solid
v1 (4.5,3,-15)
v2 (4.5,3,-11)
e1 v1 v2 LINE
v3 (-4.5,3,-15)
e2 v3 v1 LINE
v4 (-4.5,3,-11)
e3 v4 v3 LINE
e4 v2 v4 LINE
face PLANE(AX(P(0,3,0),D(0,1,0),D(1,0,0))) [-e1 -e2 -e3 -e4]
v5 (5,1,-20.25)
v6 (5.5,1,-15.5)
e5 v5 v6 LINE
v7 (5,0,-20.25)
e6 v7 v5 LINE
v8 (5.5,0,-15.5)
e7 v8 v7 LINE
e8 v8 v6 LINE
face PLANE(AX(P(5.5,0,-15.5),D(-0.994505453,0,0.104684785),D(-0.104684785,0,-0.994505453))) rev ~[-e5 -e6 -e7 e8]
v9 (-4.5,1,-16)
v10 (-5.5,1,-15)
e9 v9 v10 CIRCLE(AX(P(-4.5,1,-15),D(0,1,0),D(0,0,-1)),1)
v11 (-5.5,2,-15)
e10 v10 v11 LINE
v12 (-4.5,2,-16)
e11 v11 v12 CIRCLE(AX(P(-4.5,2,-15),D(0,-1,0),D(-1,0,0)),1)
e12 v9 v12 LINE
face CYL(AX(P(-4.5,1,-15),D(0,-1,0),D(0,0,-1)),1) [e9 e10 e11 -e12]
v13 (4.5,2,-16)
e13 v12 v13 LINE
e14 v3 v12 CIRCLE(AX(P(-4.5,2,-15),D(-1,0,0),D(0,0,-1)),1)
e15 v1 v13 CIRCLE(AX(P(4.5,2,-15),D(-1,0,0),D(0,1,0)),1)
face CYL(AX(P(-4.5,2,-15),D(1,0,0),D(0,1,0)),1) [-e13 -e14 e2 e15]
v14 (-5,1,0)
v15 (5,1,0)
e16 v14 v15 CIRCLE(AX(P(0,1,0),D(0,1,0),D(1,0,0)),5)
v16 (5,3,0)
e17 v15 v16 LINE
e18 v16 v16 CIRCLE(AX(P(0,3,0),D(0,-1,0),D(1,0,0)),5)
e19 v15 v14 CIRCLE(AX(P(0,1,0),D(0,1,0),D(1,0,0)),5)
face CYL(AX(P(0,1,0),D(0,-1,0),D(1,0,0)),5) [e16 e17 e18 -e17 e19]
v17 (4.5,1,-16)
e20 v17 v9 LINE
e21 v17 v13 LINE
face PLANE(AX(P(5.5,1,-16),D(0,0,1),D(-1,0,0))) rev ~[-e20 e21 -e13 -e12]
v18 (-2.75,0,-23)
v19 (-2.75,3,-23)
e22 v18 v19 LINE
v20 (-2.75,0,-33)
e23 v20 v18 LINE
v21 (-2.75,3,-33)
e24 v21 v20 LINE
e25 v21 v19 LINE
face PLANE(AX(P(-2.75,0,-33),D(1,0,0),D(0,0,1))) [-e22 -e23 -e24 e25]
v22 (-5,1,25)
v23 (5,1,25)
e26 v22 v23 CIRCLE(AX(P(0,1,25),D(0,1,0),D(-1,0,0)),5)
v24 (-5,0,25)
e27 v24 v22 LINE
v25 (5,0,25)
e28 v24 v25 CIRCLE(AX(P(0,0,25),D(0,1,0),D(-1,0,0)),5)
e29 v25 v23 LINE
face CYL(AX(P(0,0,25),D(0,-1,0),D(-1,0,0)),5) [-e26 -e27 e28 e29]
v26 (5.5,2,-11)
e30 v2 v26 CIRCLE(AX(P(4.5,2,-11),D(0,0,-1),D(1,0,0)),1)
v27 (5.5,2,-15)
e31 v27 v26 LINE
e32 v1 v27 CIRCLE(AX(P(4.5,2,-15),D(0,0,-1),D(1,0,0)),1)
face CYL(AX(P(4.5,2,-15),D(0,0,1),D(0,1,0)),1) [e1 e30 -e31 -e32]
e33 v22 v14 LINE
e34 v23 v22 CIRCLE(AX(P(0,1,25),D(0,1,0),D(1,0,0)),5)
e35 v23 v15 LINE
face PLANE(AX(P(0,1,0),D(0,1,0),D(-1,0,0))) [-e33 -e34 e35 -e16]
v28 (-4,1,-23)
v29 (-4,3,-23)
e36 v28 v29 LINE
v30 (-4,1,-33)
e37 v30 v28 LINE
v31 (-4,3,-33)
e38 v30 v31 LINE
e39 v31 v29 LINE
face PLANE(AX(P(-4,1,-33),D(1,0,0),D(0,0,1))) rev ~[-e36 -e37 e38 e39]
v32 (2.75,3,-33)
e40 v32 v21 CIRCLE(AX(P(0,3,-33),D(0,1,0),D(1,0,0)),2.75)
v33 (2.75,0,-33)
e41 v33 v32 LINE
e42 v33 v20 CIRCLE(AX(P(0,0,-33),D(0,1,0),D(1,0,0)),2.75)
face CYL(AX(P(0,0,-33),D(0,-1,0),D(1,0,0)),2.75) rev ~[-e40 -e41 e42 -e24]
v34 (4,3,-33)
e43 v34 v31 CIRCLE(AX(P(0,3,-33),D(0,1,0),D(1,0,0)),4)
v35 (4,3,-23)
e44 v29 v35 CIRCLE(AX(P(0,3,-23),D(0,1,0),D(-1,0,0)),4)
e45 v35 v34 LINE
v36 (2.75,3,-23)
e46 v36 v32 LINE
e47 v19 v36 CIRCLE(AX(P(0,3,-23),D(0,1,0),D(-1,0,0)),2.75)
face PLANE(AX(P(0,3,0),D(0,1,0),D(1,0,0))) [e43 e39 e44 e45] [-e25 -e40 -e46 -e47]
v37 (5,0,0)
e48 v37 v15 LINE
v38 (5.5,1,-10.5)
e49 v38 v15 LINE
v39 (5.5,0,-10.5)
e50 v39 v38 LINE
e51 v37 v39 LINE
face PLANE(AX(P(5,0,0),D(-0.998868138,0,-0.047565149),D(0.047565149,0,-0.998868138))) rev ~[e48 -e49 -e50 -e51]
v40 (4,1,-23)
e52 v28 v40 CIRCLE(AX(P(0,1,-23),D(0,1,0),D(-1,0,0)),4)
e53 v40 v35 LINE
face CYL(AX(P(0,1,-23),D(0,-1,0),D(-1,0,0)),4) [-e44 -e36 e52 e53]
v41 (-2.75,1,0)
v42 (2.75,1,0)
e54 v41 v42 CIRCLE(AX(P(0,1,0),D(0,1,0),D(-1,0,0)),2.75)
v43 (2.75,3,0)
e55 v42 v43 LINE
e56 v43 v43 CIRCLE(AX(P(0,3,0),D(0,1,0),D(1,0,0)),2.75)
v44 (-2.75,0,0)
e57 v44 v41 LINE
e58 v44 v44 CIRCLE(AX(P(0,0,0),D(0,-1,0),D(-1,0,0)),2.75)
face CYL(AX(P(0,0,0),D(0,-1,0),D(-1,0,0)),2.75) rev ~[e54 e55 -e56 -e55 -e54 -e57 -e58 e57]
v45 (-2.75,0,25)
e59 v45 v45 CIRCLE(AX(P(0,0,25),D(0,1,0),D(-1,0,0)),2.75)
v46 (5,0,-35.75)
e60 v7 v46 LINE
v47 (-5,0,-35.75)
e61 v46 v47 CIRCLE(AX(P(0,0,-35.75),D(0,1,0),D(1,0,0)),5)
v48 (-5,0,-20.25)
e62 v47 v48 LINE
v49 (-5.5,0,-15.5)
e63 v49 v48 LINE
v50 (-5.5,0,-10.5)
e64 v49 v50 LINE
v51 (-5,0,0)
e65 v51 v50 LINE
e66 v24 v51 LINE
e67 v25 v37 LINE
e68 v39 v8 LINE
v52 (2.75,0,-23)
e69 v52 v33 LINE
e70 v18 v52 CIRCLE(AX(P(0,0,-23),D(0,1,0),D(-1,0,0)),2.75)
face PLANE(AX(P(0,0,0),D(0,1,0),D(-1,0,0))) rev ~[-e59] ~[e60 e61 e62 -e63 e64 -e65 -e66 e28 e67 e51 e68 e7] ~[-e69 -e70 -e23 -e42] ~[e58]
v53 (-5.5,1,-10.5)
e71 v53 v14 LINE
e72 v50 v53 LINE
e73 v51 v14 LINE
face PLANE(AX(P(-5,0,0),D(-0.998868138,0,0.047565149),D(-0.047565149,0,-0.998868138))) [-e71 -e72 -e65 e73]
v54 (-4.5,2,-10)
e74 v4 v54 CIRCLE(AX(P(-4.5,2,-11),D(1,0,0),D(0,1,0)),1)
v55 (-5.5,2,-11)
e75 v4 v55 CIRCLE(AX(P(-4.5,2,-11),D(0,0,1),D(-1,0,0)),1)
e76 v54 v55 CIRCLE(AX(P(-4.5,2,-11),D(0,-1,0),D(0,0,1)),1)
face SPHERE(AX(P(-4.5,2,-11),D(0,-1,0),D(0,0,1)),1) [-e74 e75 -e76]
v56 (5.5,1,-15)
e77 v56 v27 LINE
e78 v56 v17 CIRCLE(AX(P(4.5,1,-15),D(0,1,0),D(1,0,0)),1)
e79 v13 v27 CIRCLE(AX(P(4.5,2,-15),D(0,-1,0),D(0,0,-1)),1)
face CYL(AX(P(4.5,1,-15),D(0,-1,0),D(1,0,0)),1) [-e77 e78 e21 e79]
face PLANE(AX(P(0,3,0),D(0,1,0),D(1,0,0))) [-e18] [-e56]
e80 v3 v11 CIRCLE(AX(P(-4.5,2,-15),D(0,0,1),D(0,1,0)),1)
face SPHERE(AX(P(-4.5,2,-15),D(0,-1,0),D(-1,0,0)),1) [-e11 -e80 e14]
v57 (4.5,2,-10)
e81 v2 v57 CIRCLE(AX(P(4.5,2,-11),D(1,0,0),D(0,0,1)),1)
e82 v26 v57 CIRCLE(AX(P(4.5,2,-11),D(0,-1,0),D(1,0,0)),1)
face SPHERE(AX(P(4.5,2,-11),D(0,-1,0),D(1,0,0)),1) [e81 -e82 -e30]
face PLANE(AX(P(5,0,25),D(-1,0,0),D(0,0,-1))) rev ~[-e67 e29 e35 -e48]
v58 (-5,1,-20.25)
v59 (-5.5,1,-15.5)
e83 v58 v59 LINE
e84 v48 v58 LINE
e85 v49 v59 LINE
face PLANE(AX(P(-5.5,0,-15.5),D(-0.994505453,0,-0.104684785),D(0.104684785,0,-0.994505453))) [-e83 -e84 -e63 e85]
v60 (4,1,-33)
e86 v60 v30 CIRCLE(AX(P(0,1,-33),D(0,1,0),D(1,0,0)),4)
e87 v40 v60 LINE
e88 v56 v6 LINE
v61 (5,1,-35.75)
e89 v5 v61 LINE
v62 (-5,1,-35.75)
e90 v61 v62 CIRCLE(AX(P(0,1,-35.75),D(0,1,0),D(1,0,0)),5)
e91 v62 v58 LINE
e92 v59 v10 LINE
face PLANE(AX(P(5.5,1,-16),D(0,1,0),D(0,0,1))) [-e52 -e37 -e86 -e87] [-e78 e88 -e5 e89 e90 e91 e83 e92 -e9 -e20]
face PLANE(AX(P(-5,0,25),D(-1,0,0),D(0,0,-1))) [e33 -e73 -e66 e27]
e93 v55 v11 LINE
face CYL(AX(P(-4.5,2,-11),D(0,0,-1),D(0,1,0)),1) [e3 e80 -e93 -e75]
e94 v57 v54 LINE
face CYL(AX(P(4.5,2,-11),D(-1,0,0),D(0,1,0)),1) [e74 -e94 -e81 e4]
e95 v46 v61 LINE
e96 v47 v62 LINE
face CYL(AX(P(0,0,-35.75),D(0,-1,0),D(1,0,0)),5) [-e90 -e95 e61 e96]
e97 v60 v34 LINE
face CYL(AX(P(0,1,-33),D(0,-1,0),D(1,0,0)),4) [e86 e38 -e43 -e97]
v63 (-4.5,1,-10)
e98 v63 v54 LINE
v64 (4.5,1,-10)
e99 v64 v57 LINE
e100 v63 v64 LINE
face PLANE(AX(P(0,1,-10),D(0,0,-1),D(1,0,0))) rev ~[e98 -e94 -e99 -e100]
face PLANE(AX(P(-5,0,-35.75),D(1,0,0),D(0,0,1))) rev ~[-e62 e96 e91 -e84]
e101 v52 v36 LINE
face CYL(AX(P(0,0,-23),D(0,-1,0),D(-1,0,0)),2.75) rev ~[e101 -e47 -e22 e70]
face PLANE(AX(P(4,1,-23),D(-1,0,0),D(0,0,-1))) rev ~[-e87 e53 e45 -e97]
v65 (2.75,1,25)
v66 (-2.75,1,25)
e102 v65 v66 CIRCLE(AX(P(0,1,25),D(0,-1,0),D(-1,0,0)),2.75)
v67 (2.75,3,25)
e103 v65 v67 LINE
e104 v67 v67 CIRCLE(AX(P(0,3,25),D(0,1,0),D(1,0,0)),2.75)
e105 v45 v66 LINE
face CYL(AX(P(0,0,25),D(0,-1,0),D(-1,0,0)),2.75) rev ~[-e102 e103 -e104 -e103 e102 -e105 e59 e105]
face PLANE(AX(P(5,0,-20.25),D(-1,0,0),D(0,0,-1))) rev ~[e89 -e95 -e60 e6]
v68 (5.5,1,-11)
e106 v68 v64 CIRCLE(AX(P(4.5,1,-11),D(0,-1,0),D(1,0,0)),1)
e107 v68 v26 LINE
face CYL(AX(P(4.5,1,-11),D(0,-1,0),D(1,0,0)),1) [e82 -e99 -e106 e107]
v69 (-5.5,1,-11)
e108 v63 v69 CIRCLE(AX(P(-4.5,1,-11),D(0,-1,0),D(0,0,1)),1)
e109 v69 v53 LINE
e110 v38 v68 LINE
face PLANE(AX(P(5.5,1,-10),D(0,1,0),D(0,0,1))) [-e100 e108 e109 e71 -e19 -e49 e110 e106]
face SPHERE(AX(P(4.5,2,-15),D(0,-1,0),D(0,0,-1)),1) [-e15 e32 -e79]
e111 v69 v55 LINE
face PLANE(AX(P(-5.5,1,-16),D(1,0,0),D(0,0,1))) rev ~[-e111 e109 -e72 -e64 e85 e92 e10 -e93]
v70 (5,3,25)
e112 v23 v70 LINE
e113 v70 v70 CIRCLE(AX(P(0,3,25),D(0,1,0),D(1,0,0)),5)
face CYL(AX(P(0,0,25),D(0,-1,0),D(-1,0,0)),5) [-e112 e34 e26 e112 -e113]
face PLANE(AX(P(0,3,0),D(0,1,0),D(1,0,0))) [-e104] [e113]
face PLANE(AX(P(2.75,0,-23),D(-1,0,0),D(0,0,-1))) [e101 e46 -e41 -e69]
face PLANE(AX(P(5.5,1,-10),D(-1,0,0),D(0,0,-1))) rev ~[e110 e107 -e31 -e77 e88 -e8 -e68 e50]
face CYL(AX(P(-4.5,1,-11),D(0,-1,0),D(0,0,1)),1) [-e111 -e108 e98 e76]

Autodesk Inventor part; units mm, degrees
ref_plane "YZ Plane" through (0, 0, 0) normal (1, 0, 0) x (0, 1, 0)
ref_plane "XZ Plane" through (0, 0, 0) normal (0, 1, 0) x (-1, 0, 0)
ref_plane "XY Plane" through (0, 0, 0) normal (0, 0, 1) x (1, 0, 0)
sketch "Sketch15" plane through (0, 0, 0) normal (0, 1, 0) x (-1, 0, 0)
  circle A0 centre (0, 0) radius 2.75
  circle A1 centre (0, 0) radius 5
  line L0 (0, 0) -> (0, -28)
  line L1 (0, -33) -> (0, -23) construction
  line L2 (2.75, -33) -> (2.75, -23)
  line L3 (-2.75, -23) -> (-2.75, -33)
  arc A2 (-2.75, -33) -> (2.75, -33) centre (0, -33) ccw
  arc A3 (2.75, -23) -> (-2.75, -23) centre (0, -23) ccw
  line L4 (0, -43) -> (0, -13) construction
  line L5 (0, 0) -> (0, -14)
  line L6 (-5.5, -15.5) -> (5.5, -15.5)
  line L7 (5.5, -15.5) -> (5.5, -10.5)
  line L8 (5.5, -10.5) -> (-5.5, -10.5)
  line L9 (-5.5, -10.5) -> (-5.5, -15.5)
  line L10 (-5.5, -15.5) -> (5.5, -10.5) construction
  line L11 (5.5, -15.5) -> (-5.5, -10.5) construction
  line L12 (5, 0) -> (5.5, -10.5)
  line L13 (-5, 0) -> (-5.5, -10.5)
  line L14 (0, -35.75) -> (0, -20.25) construction
  line L15 (5, -35.75) -> (5, -20.25)
  line L16 (-5, -20.25) -> (-5, -35.75)
  arc A4 (-5, -35.75) -> (5, -35.75) centre (0, -35.75) ccw
  arc A5 (5, -20.25) -> (-5, -20.25) centre (0, -20.25) ccw
  line L17 (5.5, -15.5) -> (5, -20.25)
  line L18 (-5.5, -15.5) -> (-5, -20.25)
  line L19 (0, 0) -> (0, 25)
  circle A6 centre (0, 25) radius 2.75
  circle A7 centre (0, 25) radius 5
  line L20 (0, 25) -> (5, 25)
  line L21 (0, 25) -> (-5, 25)
  line L22 (5, 25) -> (5, 0)
  line L23 (-5, 25) -> (-5, 0)
  point P0 (-1.5612, -15.5)
  point P1 (1.5612, -15.5)
  dimension "d102" = 5.5
  dimension "d103" = 10
  dimension "d104" = 28
  dimension "d105" = 5
  dimension "d106" = 5.5
  dimension "d107" = 15
  dimension "d109" = 14
  dimension "d110" = 11
  dimension "d111" = 5
  dimension "d112" = 10
  dimension "d133" = 25
  dimension "d134" = 5.5
  dimension "d135" = 10
extrude "Extrusion14" add sketch "Sketch15" along normal blind 1 contours A0 L19 A1 L0 | A0 L0 A1 L19 | L19 A7 L22 A1 | A1 L23 A7 L19 | L0 L8 L13 A1 | A1 L12 L8 L0 | A7 L21 A6 L19 | L19 A6 L20 A7 | L8 L7 L6 A5 L0 | L0 A5 L6 L9 L8 | L20 A6 L21 A7 | L17 A5 L6 | L6 A5 L18 | A5 L6 L0 | L0 L6 A5 | A5 L15 A4 L16 L6
sketch "Sketch16" plane through (0, 1, 0) normal (0, 1, 0) x (1, 0, 0)
  circle A0 centre (0, 0) radius 2.75 projected
  circle A1 centre (0, 0) radius 2.75
  arc A2 (-5, 0) -> (5, 0) centre (0, 0) ccw projected
  circle A3 centre (0, 0) radius 5
  line L0 (-2.75, 23) -> (-2.75, 33) projected
  line L1 (-2.75, 28) -> (0, 28)
  line L2 (0, 33) -> (0, 23) construction
  line L3 (-2.75, 33) -> (-2.75, 23)
  line L4 (2.75, 23) -> (2.75, 33)
  arc A4 (2.75, 33) -> (-2.75, 33) centre (0, 33) ccw
  arc A5 (-2.75, 23) -> (2.75, 23) centre (0, 23) ccw
  line L5 (0, 33) -> (0, 23) construction
  line L6 (-4, 33) -> (-4, 23)
  line L7 (4, 23) -> (4, 33)
  arc A6 (4, 33) -> (-4, 33) centre (0, 33) ccw
  arc A7 (-4, 23) -> (4, 23) centre (0, 23) ccw
  circle A8 centre (0, -25) radius 2.75 projected
  circle A9 centre (0, -25) radius 2.75
  circle A10 centre (0, -25) radius 5
  point P0 (5, 0)
  dimension "d115" = 5
  dimension "d116" = 5.5
  dimension "d117" = 5
  dimension "d118" = 8
  dimension "d136" = 5.5
  dimension "d137" = 10
extrude "Extrusion15" add sketch "Sketch16" along normal blind 2
sketch "Sketch17" plane through (0, 1, 0) normal (0, 1, 0) x (1, 0, 0)
  line L0 (0, 0) -> (0, 13)
  line L1 (5.5, 16) -> (-5.5, 16)
  line L2 (-5.5, 16) -> (-5.5, 10)
  line L3 (-5.5, 10) -> (5.5, 10)
  line L4 (5.5, 10) -> (5.5, 16)
  line L5 (5.5, 16) -> (-5.5, 10) construction
  line L6 (-5.5, 16) -> (5.5, 10) construction
  dimension "d121" = 13
  dimension "d129" = 11
  dimension "d130" = 6
extrude "Extrusion16" add sketch "Sketch17" along normal blind 2
fillet "Fillet7" radius 1 4 edges at (-5.5, 2, -10) (-5.5, 2, -16) (5.5, 2, -10) (5.5, 2, -16)
fillet "Fillet8" radius 1 8 edges at (5.2071, 3, -10.2929) (5.5, 3, -13) (5.2071, 3, -15.7071) (0, 3, -16) (-5.2071, 3, -15.7071) (-5.5, 3, -13) (-5.2071, 3, -10.2929) (0, 3, -10)
properties part number "Belt_Restraint"
